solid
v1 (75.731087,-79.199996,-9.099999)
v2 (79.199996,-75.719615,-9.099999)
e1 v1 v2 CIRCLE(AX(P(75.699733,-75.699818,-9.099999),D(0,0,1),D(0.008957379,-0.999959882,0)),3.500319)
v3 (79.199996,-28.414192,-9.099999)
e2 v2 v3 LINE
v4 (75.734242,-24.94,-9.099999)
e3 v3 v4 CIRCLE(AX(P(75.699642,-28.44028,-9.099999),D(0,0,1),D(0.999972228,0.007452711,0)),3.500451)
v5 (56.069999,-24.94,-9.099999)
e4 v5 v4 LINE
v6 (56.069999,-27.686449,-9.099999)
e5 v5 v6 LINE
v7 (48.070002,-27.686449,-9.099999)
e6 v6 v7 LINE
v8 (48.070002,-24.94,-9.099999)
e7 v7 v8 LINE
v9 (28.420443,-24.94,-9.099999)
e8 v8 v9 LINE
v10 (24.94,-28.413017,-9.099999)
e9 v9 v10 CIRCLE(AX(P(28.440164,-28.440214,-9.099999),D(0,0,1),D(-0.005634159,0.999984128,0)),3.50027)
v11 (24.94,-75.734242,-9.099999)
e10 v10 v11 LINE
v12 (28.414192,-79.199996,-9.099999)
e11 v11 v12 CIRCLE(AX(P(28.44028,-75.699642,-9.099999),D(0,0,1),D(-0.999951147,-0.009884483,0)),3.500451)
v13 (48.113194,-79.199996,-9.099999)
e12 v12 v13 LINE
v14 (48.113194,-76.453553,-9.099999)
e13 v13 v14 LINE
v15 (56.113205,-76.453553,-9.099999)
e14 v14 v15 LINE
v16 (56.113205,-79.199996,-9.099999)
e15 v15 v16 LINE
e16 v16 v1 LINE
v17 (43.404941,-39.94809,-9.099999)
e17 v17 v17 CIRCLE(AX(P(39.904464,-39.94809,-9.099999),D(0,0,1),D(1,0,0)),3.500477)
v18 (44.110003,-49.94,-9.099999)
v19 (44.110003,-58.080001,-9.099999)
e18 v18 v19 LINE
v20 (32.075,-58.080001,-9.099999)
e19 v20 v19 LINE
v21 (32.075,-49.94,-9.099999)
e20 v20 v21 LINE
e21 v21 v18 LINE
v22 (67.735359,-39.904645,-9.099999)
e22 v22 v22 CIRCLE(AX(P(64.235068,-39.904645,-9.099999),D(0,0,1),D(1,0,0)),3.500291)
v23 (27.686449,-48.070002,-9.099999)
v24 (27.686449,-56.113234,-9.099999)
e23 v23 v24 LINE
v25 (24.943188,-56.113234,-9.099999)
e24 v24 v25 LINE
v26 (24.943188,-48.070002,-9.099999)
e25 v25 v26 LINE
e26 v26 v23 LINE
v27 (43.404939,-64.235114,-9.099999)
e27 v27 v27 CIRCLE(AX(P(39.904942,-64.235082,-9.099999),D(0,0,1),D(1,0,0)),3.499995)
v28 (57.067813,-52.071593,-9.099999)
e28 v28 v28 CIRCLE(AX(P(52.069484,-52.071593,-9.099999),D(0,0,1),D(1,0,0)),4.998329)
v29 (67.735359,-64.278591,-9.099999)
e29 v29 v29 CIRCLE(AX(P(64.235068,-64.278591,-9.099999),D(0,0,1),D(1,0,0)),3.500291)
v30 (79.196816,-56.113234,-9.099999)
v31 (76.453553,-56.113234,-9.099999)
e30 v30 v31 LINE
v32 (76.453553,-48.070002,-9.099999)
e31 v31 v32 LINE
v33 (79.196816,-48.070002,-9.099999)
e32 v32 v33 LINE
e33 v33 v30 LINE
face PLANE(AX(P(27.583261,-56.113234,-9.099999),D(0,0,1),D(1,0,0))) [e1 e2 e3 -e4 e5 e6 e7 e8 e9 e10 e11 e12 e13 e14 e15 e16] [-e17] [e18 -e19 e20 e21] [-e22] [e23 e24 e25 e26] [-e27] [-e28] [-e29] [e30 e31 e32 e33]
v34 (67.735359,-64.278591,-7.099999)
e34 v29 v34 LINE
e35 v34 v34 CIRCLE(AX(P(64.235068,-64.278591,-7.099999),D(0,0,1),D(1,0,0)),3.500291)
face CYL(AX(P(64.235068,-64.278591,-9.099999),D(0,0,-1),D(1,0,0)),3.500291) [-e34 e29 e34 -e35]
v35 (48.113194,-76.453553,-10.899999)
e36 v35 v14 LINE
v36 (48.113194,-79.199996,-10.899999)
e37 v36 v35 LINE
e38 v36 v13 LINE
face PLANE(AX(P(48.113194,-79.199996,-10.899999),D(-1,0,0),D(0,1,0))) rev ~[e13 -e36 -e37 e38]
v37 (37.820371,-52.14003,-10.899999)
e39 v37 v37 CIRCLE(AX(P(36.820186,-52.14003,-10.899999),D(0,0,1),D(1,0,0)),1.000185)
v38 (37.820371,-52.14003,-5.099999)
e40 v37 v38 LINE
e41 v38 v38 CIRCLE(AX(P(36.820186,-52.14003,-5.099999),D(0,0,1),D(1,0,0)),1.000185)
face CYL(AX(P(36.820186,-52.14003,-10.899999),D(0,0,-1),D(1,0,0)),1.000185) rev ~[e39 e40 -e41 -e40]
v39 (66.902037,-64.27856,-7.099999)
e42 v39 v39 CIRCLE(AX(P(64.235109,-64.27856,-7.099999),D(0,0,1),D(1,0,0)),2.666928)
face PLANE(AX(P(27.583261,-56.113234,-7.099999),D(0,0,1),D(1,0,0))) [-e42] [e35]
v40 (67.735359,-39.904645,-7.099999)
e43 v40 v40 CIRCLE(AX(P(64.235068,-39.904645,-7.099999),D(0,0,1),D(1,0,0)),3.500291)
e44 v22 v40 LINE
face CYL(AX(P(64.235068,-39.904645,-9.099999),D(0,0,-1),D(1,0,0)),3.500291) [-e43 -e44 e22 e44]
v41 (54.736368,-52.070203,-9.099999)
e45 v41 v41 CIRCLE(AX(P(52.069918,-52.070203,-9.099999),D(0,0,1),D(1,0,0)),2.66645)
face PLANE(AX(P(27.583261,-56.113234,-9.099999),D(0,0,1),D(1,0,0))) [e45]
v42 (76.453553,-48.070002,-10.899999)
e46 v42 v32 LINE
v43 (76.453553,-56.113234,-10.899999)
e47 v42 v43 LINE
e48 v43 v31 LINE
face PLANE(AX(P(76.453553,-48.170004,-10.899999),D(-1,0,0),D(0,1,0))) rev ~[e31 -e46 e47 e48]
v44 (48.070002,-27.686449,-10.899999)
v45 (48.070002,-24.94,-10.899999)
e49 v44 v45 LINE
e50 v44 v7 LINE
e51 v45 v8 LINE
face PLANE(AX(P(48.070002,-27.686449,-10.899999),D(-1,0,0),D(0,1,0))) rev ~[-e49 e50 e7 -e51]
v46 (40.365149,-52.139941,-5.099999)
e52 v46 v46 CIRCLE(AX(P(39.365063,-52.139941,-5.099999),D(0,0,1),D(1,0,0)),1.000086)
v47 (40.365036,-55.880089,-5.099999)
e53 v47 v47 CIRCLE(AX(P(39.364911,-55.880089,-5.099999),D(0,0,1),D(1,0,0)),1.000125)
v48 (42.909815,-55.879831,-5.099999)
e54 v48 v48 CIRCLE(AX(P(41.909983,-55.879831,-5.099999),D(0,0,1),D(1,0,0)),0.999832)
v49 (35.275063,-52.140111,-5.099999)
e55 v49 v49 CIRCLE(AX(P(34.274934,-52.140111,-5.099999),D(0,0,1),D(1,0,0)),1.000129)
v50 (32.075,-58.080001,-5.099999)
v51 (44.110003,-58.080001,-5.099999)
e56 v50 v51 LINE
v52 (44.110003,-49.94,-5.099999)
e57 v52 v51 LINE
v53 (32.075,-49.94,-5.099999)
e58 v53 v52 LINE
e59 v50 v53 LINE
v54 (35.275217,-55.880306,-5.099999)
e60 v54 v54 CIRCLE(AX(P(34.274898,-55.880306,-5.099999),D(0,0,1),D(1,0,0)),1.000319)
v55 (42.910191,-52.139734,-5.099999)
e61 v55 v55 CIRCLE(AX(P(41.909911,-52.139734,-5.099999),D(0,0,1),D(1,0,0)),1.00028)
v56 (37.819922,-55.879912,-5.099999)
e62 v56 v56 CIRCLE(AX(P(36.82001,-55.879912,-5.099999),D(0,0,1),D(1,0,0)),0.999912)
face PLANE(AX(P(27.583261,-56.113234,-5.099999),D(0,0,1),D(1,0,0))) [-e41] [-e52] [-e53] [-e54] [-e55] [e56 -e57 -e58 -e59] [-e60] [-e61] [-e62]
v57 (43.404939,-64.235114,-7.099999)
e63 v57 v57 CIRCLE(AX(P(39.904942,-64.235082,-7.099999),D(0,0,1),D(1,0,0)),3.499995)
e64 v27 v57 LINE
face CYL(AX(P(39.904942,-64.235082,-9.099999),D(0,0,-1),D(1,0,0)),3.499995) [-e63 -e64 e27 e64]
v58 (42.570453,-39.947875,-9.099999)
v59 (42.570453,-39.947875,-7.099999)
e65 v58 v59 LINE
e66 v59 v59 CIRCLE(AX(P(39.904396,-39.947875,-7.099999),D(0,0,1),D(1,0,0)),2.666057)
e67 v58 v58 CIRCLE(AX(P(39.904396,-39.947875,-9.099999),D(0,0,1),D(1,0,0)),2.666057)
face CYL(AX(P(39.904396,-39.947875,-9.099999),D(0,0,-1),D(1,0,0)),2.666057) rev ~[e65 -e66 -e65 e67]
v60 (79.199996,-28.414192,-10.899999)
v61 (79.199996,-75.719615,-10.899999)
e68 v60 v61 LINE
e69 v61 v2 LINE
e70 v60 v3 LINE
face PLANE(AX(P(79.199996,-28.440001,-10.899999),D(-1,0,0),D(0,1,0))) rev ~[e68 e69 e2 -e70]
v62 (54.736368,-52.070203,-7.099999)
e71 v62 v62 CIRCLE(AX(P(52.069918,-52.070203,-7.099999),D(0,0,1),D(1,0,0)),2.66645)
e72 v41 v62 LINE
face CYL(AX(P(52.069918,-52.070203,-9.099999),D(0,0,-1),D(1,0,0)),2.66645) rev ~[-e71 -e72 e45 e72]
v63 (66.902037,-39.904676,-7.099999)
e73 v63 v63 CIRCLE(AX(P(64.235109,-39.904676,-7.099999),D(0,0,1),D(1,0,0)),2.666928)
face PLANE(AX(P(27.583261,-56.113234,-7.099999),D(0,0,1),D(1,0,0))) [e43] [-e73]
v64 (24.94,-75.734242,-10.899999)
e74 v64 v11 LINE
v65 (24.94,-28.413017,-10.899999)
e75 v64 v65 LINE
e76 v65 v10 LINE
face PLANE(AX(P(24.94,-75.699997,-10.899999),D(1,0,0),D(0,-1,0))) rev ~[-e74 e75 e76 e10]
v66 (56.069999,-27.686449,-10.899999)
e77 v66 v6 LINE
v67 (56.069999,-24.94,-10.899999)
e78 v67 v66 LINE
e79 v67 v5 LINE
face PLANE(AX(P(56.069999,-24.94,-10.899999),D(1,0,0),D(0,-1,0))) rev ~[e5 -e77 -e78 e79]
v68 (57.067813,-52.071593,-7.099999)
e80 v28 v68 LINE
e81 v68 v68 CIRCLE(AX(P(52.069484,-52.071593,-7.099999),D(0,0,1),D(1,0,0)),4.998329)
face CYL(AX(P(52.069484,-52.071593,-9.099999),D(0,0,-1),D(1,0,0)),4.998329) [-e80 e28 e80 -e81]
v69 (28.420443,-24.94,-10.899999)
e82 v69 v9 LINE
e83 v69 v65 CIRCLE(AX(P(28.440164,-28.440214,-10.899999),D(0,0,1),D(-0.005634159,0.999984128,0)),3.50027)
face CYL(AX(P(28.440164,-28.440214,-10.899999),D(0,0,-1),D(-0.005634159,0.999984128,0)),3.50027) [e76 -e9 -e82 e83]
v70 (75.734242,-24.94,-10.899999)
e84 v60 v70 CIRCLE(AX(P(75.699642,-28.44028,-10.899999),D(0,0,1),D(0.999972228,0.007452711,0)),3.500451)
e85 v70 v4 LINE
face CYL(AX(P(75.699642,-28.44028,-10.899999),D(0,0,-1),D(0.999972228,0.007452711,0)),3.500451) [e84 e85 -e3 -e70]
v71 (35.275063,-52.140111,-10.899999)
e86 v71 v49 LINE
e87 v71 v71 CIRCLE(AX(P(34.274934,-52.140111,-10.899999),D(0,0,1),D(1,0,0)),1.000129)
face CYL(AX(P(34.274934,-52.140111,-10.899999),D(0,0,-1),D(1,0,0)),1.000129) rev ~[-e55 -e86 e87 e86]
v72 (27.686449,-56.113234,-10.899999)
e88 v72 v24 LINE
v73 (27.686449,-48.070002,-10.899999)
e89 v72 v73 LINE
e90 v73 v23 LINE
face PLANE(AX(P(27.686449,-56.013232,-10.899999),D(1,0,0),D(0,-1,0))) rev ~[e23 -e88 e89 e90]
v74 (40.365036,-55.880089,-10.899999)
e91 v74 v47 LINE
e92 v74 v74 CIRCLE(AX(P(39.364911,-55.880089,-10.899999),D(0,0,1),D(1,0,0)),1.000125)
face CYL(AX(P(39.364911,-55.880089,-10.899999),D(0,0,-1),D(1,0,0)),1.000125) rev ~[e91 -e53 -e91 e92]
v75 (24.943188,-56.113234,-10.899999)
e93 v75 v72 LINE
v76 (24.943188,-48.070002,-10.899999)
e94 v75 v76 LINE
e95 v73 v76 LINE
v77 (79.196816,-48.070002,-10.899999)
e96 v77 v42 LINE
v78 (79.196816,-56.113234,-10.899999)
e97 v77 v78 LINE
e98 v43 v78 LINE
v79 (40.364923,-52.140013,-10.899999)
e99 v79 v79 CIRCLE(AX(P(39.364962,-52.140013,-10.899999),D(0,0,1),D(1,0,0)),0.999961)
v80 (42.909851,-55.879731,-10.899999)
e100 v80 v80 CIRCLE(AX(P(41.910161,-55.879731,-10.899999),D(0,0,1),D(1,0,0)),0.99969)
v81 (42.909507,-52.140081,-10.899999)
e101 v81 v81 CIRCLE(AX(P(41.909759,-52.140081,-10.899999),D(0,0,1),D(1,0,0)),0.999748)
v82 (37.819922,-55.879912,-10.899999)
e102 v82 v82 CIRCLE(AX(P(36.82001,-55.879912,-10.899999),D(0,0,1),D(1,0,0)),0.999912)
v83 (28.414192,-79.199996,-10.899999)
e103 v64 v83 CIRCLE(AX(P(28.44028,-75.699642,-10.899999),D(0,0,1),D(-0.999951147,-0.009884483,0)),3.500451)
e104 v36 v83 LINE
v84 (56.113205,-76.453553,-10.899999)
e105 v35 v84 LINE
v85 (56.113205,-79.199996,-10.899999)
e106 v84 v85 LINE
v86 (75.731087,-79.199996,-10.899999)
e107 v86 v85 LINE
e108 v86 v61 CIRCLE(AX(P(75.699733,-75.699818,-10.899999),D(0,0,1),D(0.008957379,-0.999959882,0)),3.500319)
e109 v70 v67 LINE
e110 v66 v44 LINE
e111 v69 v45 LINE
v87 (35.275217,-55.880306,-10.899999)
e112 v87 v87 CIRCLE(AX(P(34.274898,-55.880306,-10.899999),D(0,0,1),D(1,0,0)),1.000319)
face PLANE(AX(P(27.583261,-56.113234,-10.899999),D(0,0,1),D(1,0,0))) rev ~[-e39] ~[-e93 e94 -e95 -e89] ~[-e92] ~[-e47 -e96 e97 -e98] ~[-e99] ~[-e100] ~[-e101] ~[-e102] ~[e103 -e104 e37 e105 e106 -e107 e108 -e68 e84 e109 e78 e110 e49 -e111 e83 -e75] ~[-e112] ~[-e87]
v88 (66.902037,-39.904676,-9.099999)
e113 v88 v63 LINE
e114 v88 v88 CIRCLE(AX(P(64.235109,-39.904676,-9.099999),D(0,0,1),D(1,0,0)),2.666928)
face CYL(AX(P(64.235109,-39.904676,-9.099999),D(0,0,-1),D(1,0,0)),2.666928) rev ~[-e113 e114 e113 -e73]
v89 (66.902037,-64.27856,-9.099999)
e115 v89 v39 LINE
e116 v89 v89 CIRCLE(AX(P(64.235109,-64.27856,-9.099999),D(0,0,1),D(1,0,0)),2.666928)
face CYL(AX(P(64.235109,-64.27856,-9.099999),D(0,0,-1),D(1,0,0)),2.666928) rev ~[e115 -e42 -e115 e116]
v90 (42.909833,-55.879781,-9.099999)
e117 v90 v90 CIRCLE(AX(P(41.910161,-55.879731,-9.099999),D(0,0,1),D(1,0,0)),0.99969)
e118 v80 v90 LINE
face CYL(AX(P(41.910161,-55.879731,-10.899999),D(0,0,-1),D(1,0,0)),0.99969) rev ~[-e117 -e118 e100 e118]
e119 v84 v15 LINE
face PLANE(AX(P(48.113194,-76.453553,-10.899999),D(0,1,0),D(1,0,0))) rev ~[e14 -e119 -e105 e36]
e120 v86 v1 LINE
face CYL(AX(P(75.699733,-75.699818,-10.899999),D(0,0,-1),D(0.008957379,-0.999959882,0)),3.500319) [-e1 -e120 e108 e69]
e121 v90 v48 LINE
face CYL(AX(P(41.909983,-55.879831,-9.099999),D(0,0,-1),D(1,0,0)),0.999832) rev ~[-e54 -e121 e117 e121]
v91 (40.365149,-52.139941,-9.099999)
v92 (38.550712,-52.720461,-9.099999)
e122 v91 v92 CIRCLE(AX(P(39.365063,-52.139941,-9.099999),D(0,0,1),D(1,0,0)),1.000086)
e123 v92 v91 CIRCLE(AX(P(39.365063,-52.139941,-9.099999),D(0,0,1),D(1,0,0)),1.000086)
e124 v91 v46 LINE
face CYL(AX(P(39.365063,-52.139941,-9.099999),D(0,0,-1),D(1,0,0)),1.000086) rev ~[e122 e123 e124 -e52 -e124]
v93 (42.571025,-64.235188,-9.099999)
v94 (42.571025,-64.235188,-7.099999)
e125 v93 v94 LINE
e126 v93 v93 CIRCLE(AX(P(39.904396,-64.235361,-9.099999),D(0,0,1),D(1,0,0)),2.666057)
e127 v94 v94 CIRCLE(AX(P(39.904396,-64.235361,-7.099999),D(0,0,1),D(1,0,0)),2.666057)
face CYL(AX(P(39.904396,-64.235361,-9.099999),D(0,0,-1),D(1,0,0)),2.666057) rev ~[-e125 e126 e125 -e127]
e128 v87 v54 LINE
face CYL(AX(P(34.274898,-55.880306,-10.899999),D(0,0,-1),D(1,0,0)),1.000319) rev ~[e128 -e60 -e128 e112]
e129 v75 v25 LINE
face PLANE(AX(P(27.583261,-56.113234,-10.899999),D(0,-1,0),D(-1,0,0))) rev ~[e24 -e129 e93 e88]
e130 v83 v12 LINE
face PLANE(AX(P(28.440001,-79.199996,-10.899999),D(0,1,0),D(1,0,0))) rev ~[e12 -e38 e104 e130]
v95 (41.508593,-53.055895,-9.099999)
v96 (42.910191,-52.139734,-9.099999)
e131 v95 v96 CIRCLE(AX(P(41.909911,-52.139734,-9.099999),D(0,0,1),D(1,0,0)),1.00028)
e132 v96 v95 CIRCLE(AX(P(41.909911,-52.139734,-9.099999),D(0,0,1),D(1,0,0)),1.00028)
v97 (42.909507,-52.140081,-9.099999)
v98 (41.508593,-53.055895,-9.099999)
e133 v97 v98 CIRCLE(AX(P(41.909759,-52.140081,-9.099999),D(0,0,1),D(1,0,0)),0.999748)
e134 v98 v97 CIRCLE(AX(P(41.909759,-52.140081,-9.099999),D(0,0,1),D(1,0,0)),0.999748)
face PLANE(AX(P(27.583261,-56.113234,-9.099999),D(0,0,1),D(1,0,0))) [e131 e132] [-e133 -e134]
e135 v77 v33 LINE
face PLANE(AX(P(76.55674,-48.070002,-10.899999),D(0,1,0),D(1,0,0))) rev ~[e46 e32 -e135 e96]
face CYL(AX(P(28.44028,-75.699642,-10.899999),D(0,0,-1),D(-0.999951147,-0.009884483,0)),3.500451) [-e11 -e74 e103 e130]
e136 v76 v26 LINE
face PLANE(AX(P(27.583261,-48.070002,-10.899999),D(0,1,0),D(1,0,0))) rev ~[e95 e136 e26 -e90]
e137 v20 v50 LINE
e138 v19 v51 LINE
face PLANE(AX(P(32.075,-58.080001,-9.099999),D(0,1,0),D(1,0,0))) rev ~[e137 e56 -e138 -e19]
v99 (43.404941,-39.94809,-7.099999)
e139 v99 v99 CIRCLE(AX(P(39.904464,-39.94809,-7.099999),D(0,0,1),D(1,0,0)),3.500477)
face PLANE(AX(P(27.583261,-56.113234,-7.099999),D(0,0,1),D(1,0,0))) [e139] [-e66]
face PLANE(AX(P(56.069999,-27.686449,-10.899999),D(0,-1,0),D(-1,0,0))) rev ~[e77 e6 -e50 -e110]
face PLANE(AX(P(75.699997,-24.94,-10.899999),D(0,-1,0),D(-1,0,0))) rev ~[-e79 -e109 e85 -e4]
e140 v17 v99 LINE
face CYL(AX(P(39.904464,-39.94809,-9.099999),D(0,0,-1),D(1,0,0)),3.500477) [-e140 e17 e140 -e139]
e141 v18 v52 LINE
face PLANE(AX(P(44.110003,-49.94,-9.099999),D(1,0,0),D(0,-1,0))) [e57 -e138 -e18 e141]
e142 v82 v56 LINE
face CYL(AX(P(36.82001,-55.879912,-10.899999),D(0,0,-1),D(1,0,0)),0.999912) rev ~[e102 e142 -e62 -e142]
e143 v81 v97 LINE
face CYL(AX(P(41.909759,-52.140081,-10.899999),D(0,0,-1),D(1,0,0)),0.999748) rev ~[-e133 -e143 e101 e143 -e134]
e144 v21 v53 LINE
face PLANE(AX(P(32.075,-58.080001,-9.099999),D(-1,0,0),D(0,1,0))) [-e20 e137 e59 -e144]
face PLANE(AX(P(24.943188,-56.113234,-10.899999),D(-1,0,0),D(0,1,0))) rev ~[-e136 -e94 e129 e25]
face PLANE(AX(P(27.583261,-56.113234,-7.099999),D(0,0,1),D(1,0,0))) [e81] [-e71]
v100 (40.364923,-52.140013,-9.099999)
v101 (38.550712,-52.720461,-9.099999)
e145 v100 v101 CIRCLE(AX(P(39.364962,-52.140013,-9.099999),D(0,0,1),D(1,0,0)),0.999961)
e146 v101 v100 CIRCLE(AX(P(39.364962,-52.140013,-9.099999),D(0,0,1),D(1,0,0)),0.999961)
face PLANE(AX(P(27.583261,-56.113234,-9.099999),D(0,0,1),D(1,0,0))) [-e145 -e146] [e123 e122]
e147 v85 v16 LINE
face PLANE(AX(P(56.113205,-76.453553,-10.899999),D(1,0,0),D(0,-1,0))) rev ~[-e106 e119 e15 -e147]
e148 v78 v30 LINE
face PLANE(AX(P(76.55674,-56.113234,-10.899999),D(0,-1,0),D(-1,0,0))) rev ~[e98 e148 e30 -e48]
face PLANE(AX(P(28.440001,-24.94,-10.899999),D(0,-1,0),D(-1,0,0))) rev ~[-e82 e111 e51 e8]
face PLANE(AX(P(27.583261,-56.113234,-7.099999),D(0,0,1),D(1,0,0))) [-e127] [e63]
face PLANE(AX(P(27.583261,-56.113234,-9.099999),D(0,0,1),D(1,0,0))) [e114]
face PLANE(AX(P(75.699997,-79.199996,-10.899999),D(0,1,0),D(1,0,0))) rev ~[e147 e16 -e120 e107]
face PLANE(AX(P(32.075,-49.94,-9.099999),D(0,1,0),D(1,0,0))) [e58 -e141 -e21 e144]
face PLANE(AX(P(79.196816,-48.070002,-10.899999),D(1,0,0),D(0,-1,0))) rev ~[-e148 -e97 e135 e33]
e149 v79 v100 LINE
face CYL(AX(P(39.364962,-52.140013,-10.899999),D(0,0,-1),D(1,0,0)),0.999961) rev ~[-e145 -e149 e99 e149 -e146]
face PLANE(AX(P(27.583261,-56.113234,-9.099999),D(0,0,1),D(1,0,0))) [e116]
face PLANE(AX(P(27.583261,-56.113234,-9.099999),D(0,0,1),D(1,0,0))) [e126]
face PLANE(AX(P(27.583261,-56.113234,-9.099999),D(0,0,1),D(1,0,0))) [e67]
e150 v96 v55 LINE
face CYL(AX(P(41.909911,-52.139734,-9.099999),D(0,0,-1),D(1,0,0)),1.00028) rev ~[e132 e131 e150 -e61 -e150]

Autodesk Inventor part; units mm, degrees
sketch "Skizze1" plane through (27.583261, -56.113234, -10.899999) normal (0, 0, 1) x (1, 0, 0)
  line L0 (20.486741, 28.426785) -> (20.486741, 31.173234)
  line L1 (28.486738, 28.426785) -> (20.486741, 28.426785)
  line L2 (28.486738, 31.173234) -> (28.486738, 28.426785)
  circle A0 centre (48.116381, 27.672954) radius 3.500451
  line L3 (48.870292, 0.100002) -> (48.870292, 7.94323)
  line L4 (48.973479, 8.043232) -> (51.613555, 8.043232)
  line L5 (51.613555, 0) -> (48.973479, 0)
  circle A1 centre (48.116472, -19.586583) radius 3.50032
  line L6 (20.529933, -20.340319) -> (28.529944, -20.340319)
  line L7 (28.529944, -20.340319) -> (28.529944, -23.086762)
  line L8 (20.529933, -23.086762) -> (20.529933, -20.340319)
  circle A2 centre (0.857019, -19.586408) radius 3.500451
  line L9 (0.103188, 7.94323) -> (0.103188, 0.100002)
  line L10 (-2.640073, 8.043232) -> (0, 8.043232)
  line L11 (0, 0) -> (-2.640073, 0)
  circle A3 centre (0.856903, 27.67302) radius 3.50027
  circle A4 centre (6.691673, 3.973123) radius 1.000129
  circle A5 centre (9.236925, 3.973204) radius 1.000185
  circle A6 centre (11.781701, 3.973221) radius 0.999961
  circle A7 centre (14.326498, 3.973153) radius 0.999748
  circle A8 centre (14.3269, 0.233503) radius 0.99969
  circle A9 centre (11.78165, 0.233145) radius 1.000125
  circle A10 centre (9.236749, 0.233322) radius 0.999912
  circle A11 centre (6.691637, 0.232928) radius 1.000319
  line L12 (-2.640073, 8.043232) -> (0.103188, 8.043232)
  line L13 (0.103188, 8.043232) -> (0.103188, 0)
  line L14 (0.103188, 0) -> (-2.640073, 0)
  line L15 (20.486741, 31.173234) -> (20.486741, 28.426785)
  line L16 (28.486738, 28.426785) -> (28.486738, 31.173234)
  line L17 (48.116736, 31.173234) -> (28.486738, 31.173234)
  line L18 (0.85674, -23.086762) -> (20.529933, -23.086762)
  line L19 (-2.643261, 0.100002) -> (-2.643261, -19.586763)
  line L20 (51.616735, -19.586763) -> (51.616735, 0.100002)
  line L21 (-2.643261, 27.673233) -> (-2.643261, 7.94323)
  line L22 (20.486741, 31.173234) -> (0.85674, 31.173234)
  line L23 (51.616735, 7.94323) -> (51.616735, 27.673233)
  line L24 (28.529944, -23.086762) -> (48.116736, -23.086762)
  line L25 (-2.643261, -23.086762) -> (51.616735, -23.086762)
  line L26 (51.616735, -23.086762) -> (51.616735, 31.173234)
  line L27 (51.616735, 31.173234) -> (-2.643261, 31.173234)
  line L28 (-2.643261, 31.173234) -> (-2.643261, -23.086762)
  line L29 (51.613555, 8.043232) -> (48.870292, 8.043232)
  line L30 (48.870292, 8.043232) -> (48.870292, 0)
  line L31 (48.870292, 0) -> (51.613555, 0)
  line L32 (48.870292, 0) -> (51.613555, 0)
  line L33 (48.870292, 0) -> (48.870292, 8.043232)
  line L34 (51.613555, 8.043232) -> (48.870292, 8.043232)
  line L35 (48.870292, 8.043232) -> (48.870292, 0)
  line L36 (48.870292, 0) -> (51.613555, 0)
  line L37 (51.613555, 0) -> (51.613555, 8.043232)
  line L38 (0.103188, 0) -> (-2.640073, 0)
  line L39 (-2.640073, 8.043232) -> (0.103188, 8.043232)
  line L40 (0.103188, 0) -> (-2.640073, 0)
  line L41 (-2.640073, 0) -> (-2.640073, 8.043232)
  line L42 (-2.640073, 8.043232) -> (0.103188, 8.043232)
  line L43 (0.103188, 8.043232) -> (0.103188, 0)
  point P0 (-27.583261, 56.113234)
  point P1 (0.837182, 31.173234)
  point P2 (-2.643261, 27.700217)
  point P3 (-2.643261, -19.621008)
  point P4 (0.830931, -23.086762)
  point P5 (48.147826, -23.086762)
  point P6 (51.616735, -19.606381)
  point P7 (51.616735, 27.699042)
  point P8 (48.150981, 31.173234)
sketch "Skizze1 outline for Extrusion2" plane through (27.583261, -56.113234, -10.899999) normal (0, 0, 1) x (1, 0, 0)
  line L0 (28.486738, 28.426785) -> (20.486741, 28.426785)
  line L1 (28.486738, 31.173234) -> (28.486738, 28.426785)
  line L2 (20.486741, 28.426785) -> (20.486741, 31.173234)
  line L3 (48.116736, 31.173234) -> (28.486738, 31.173234)
  line L4 (20.486741, 31.173234) -> (0.85674, 31.173234)
  line L5 (48.150981, 31.173234) -> (48.116736, 31.173234)
  line L6 (0.85674, 31.173234) -> (0.837182, 31.173234)
  arc A0 (51.616735, 27.699042) -> (48.150981, 31.173234) centre (48.116381, 27.672954) ccw
  arc A1 (0.837182, 31.173234) -> (-2.643261, 27.700217) centre (0.856903, 27.67302) ccw
  line L7 (51.616735, 27.673233) -> (51.616735, 27.699042)
  line L8 (-2.643261, 27.700217) -> (-2.643261, 27.673233)
  line L9 (51.616735, 7.94323) -> (51.616735, 27.673233)
  line L10 (-2.643261, 27.673233) -> (-2.643261, 7.94323)
  line L11 (51.616735, 0.100002) -> (51.616735, 7.94323)
  line L12 (-2.643261, 7.94323) -> (-2.643261, 0.100002)
  line L13 (51.616735, -19.586763) -> (51.616735, 0.100002)
  line L14 (-2.643261, 0.100002) -> (-2.643261, -19.586763)
  line L15 (51.616735, -19.606381) -> (51.616735, -19.586763)
  line L16 (-2.643261, -19.586763) -> (-2.643261, -19.621008)
  arc A2 (48.147826, -23.086762) -> (51.616735, -19.606381) centre (48.116472, -19.586583) ccw
  arc A3 (-2.643261, -19.621008) -> (0.830931, -23.086762) centre (0.857019, -19.586408) ccw
  line L17 (48.116736, -23.086762) -> (48.147826, -23.086762)
  line L18 (0.830931, -23.086762) -> (0.85674, -23.086762)
  line L19 (28.529944, -23.086762) -> (48.116736, -23.086762)
  line L20 (0.85674, -23.086762) -> (20.529933, -23.086762)
  line L21 (28.529944, -20.340319) -> (28.529944, -23.086762)
  line L22 (20.529933, -23.086762) -> (20.529933, -20.340319)
  line L23 (20.529933, -20.340319) -> (28.529944, -20.340319)
  circle A4 centre (6.691637, 0.232928) radius 1.000319
  circle A5 centre (9.236749, 0.233322) radius 0.999912
  circle A6 centre (11.78165, 0.233145) radius 1.000125
  circle A7 centre (14.3269, 0.233503) radius 0.99969
  line L24 (-2.640073, 0) -> (-2.640073, 8.043232)
  line L25 (0, 0) -> (-2.640073, 0)
  line L26 (0.103188, 0) -> (0, 0)
  line L27 (0.103188, 0.100002) -> (0.103188, 0)
  line L28 (0.103188, 7.94323) -> (0.103188, 0.100002)
  line L29 (0.103188, 8.043232) -> (0.103188, 7.94323)
  line L30 (0, 8.043232) -> (0.103188, 8.043232)
  line L31 (-2.640073, 8.043232) -> (0, 8.043232)
  circle A8 centre (6.691673, 3.973123) radius 1.000129
  circle A9 centre (9.236925, 3.973204) radius 1.000185
  circle A10 centre (11.781701, 3.973221) radius 0.999961
  circle A11 centre (14.326498, 3.973153) radius 0.999748
  line L32 (51.613555, 8.043232) -> (51.613555, 0)
  line L33 (48.973479, 8.043232) -> (51.613555, 8.043232)
  line L34 (48.870292, 8.043232) -> (48.973479, 8.043232)
  line L35 (48.870292, 7.94323) -> (48.870292, 8.043232)
  line L36 (48.870292, 0.100002) -> (48.870292, 7.94323)
  line L37 (48.870292, 0) -> (48.870292, 0.100002)
  line L38 (48.973479, 0) -> (48.870292, 0)
  line L39 (51.613555, 0) -> (48.973479, 0)
extrude "Extrusion2" add sketch "Skizze1 outline for Extrusion2" along normal blind 1.8
sketch "Skizze2" plane through (27.583261, -56.113234, -9.099999) normal (0, 0, 1) x (1, 0, 0)
  line L0 (4.491739, -1.966767) -> (16.526742, -1.966767)
  line L1 (4.491739, -1.966767) -> (4.491739, 6.173234)
  line L2 (16.526742, 6.173234) -> (16.526742, -1.966767)
  line L3 (4.491739, 6.173234) -> (16.526742, 6.173234)
  line L4 (16.526742, -1.966767) -> (4.491739, -1.966767)
  circle A0 centre (9.236925, 3.973204) radius 1.000185
  circle A1 centre (11.781802, 3.973293) radius 1.000086
  circle A2 centre (14.32665, 3.9735) radius 1.00028
  circle A3 centre (14.326722, 0.233403) radius 0.999832
  circle A4 centre (11.78165, 0.233145) radius 1.000125
  circle A5 centre (9.236749, 0.233322) radius 0.999912
  circle A6 centre (6.691673, 3.973123) radius 1.000129
  circle A7 centre (6.691637, 0.232928) radius 1.000319
  point P0 (-27.583261, 56.113234)
extrude "Extrusion3" add sketch "Skizze2" along normal blind 4
sketch "Skizze3" plane through (27.583261, -56.113234, -9.099999) normal (0, 0, 1) x (1, 0, 0)
  circle A0 centre (12.321135, -8.122127) radius 2.666057
  circle A1 centre (12.321681, -8.121848) radius 3.499995
  circle A2 centre (12.3219, -8.121781) radius 2.666437
  circle A3 centre (12.321203, -8.121912) radius 3.500477
  circle A4 centre (24.486223, 4.041641) radius 4.998329
  circle A5 centre (24.486657, 4.043031) radius 2.66645
  circle A6 centre (36.651848, 16.208558) radius 2.666928
  circle A7 centre (36.651807, 16.208589) radius 3.500291
  line L0 (51.613555, 8.043232) -> (51.613555, 0)
  line L1 (51.613555, 4.021616) -> (-2.640073, 4.021616) construction
  line L2 (-2.640073, 0) -> (-2.640073, 8.043232)
  circle A8 centre (12.321135, 16.165359) radius 2.666057
  circle A9 centre (12.321203, 16.165144) radius 3.500477
  circle A10 centre (36.651848, -8.165326) radius 2.666928
  circle A11 centre (36.651807, -8.165357) radius 3.500291
  point P0 (-27.583261, 56.113234)
  point P1 (10.243668, -6.451202)
  point P2 (12.201311, -10.78549)
extrude "Extrusion4" add sketch "Skizze3" along normal blind 2
sketch "Skizze4" plane through (27.583261, -56.113234, -9.099999) normal (0, 0, 1) x (1, 0, 0)
  line L0 (51.616735, -19.606381) -> (51.616735, 27.699042) construction
  line L1 (51.616735, 4.04633) -> (-2.640073, 4.021616) construction
  line L2 (-2.640073, 0) -> (-2.640073, 8.043232) construction
  circle A0 centre (36.651848, 16.208558) radius 2.666928 construction
  circle A1 centre (36.651807, 16.208589) radius 3.500291 construction
  circle A2 centre (12.321681, -8.121848) radius 3.499995 construction
  arc A3 (12.201311, -10.78549) -> (10.243668, -6.451202) centre (12.3219, -8.121781) ccw construction
  arc A4 (10.243668, -6.451202) -> (12.201311, -10.78549) centre (12.321135, -8.122127) ccw construction
  circle A5 centre (24.486657, 4.043031) radius 2.66645 construction
  circle A6 centre (36.651848, 16.208558) radius 2.666928 construction
  arc A7 (10.243668, -6.451202) -> (12.201311, -10.78549) centre (12.321135, -8.122127) ccw construction
  arc A8 (12.201311, -10.78549) -> (10.243668, -6.451202) centre (12.3219, -8.121781) ccw construction
  point P0 (-27.583261, 56.113234)
properties part number "brick_bottom_standard"
